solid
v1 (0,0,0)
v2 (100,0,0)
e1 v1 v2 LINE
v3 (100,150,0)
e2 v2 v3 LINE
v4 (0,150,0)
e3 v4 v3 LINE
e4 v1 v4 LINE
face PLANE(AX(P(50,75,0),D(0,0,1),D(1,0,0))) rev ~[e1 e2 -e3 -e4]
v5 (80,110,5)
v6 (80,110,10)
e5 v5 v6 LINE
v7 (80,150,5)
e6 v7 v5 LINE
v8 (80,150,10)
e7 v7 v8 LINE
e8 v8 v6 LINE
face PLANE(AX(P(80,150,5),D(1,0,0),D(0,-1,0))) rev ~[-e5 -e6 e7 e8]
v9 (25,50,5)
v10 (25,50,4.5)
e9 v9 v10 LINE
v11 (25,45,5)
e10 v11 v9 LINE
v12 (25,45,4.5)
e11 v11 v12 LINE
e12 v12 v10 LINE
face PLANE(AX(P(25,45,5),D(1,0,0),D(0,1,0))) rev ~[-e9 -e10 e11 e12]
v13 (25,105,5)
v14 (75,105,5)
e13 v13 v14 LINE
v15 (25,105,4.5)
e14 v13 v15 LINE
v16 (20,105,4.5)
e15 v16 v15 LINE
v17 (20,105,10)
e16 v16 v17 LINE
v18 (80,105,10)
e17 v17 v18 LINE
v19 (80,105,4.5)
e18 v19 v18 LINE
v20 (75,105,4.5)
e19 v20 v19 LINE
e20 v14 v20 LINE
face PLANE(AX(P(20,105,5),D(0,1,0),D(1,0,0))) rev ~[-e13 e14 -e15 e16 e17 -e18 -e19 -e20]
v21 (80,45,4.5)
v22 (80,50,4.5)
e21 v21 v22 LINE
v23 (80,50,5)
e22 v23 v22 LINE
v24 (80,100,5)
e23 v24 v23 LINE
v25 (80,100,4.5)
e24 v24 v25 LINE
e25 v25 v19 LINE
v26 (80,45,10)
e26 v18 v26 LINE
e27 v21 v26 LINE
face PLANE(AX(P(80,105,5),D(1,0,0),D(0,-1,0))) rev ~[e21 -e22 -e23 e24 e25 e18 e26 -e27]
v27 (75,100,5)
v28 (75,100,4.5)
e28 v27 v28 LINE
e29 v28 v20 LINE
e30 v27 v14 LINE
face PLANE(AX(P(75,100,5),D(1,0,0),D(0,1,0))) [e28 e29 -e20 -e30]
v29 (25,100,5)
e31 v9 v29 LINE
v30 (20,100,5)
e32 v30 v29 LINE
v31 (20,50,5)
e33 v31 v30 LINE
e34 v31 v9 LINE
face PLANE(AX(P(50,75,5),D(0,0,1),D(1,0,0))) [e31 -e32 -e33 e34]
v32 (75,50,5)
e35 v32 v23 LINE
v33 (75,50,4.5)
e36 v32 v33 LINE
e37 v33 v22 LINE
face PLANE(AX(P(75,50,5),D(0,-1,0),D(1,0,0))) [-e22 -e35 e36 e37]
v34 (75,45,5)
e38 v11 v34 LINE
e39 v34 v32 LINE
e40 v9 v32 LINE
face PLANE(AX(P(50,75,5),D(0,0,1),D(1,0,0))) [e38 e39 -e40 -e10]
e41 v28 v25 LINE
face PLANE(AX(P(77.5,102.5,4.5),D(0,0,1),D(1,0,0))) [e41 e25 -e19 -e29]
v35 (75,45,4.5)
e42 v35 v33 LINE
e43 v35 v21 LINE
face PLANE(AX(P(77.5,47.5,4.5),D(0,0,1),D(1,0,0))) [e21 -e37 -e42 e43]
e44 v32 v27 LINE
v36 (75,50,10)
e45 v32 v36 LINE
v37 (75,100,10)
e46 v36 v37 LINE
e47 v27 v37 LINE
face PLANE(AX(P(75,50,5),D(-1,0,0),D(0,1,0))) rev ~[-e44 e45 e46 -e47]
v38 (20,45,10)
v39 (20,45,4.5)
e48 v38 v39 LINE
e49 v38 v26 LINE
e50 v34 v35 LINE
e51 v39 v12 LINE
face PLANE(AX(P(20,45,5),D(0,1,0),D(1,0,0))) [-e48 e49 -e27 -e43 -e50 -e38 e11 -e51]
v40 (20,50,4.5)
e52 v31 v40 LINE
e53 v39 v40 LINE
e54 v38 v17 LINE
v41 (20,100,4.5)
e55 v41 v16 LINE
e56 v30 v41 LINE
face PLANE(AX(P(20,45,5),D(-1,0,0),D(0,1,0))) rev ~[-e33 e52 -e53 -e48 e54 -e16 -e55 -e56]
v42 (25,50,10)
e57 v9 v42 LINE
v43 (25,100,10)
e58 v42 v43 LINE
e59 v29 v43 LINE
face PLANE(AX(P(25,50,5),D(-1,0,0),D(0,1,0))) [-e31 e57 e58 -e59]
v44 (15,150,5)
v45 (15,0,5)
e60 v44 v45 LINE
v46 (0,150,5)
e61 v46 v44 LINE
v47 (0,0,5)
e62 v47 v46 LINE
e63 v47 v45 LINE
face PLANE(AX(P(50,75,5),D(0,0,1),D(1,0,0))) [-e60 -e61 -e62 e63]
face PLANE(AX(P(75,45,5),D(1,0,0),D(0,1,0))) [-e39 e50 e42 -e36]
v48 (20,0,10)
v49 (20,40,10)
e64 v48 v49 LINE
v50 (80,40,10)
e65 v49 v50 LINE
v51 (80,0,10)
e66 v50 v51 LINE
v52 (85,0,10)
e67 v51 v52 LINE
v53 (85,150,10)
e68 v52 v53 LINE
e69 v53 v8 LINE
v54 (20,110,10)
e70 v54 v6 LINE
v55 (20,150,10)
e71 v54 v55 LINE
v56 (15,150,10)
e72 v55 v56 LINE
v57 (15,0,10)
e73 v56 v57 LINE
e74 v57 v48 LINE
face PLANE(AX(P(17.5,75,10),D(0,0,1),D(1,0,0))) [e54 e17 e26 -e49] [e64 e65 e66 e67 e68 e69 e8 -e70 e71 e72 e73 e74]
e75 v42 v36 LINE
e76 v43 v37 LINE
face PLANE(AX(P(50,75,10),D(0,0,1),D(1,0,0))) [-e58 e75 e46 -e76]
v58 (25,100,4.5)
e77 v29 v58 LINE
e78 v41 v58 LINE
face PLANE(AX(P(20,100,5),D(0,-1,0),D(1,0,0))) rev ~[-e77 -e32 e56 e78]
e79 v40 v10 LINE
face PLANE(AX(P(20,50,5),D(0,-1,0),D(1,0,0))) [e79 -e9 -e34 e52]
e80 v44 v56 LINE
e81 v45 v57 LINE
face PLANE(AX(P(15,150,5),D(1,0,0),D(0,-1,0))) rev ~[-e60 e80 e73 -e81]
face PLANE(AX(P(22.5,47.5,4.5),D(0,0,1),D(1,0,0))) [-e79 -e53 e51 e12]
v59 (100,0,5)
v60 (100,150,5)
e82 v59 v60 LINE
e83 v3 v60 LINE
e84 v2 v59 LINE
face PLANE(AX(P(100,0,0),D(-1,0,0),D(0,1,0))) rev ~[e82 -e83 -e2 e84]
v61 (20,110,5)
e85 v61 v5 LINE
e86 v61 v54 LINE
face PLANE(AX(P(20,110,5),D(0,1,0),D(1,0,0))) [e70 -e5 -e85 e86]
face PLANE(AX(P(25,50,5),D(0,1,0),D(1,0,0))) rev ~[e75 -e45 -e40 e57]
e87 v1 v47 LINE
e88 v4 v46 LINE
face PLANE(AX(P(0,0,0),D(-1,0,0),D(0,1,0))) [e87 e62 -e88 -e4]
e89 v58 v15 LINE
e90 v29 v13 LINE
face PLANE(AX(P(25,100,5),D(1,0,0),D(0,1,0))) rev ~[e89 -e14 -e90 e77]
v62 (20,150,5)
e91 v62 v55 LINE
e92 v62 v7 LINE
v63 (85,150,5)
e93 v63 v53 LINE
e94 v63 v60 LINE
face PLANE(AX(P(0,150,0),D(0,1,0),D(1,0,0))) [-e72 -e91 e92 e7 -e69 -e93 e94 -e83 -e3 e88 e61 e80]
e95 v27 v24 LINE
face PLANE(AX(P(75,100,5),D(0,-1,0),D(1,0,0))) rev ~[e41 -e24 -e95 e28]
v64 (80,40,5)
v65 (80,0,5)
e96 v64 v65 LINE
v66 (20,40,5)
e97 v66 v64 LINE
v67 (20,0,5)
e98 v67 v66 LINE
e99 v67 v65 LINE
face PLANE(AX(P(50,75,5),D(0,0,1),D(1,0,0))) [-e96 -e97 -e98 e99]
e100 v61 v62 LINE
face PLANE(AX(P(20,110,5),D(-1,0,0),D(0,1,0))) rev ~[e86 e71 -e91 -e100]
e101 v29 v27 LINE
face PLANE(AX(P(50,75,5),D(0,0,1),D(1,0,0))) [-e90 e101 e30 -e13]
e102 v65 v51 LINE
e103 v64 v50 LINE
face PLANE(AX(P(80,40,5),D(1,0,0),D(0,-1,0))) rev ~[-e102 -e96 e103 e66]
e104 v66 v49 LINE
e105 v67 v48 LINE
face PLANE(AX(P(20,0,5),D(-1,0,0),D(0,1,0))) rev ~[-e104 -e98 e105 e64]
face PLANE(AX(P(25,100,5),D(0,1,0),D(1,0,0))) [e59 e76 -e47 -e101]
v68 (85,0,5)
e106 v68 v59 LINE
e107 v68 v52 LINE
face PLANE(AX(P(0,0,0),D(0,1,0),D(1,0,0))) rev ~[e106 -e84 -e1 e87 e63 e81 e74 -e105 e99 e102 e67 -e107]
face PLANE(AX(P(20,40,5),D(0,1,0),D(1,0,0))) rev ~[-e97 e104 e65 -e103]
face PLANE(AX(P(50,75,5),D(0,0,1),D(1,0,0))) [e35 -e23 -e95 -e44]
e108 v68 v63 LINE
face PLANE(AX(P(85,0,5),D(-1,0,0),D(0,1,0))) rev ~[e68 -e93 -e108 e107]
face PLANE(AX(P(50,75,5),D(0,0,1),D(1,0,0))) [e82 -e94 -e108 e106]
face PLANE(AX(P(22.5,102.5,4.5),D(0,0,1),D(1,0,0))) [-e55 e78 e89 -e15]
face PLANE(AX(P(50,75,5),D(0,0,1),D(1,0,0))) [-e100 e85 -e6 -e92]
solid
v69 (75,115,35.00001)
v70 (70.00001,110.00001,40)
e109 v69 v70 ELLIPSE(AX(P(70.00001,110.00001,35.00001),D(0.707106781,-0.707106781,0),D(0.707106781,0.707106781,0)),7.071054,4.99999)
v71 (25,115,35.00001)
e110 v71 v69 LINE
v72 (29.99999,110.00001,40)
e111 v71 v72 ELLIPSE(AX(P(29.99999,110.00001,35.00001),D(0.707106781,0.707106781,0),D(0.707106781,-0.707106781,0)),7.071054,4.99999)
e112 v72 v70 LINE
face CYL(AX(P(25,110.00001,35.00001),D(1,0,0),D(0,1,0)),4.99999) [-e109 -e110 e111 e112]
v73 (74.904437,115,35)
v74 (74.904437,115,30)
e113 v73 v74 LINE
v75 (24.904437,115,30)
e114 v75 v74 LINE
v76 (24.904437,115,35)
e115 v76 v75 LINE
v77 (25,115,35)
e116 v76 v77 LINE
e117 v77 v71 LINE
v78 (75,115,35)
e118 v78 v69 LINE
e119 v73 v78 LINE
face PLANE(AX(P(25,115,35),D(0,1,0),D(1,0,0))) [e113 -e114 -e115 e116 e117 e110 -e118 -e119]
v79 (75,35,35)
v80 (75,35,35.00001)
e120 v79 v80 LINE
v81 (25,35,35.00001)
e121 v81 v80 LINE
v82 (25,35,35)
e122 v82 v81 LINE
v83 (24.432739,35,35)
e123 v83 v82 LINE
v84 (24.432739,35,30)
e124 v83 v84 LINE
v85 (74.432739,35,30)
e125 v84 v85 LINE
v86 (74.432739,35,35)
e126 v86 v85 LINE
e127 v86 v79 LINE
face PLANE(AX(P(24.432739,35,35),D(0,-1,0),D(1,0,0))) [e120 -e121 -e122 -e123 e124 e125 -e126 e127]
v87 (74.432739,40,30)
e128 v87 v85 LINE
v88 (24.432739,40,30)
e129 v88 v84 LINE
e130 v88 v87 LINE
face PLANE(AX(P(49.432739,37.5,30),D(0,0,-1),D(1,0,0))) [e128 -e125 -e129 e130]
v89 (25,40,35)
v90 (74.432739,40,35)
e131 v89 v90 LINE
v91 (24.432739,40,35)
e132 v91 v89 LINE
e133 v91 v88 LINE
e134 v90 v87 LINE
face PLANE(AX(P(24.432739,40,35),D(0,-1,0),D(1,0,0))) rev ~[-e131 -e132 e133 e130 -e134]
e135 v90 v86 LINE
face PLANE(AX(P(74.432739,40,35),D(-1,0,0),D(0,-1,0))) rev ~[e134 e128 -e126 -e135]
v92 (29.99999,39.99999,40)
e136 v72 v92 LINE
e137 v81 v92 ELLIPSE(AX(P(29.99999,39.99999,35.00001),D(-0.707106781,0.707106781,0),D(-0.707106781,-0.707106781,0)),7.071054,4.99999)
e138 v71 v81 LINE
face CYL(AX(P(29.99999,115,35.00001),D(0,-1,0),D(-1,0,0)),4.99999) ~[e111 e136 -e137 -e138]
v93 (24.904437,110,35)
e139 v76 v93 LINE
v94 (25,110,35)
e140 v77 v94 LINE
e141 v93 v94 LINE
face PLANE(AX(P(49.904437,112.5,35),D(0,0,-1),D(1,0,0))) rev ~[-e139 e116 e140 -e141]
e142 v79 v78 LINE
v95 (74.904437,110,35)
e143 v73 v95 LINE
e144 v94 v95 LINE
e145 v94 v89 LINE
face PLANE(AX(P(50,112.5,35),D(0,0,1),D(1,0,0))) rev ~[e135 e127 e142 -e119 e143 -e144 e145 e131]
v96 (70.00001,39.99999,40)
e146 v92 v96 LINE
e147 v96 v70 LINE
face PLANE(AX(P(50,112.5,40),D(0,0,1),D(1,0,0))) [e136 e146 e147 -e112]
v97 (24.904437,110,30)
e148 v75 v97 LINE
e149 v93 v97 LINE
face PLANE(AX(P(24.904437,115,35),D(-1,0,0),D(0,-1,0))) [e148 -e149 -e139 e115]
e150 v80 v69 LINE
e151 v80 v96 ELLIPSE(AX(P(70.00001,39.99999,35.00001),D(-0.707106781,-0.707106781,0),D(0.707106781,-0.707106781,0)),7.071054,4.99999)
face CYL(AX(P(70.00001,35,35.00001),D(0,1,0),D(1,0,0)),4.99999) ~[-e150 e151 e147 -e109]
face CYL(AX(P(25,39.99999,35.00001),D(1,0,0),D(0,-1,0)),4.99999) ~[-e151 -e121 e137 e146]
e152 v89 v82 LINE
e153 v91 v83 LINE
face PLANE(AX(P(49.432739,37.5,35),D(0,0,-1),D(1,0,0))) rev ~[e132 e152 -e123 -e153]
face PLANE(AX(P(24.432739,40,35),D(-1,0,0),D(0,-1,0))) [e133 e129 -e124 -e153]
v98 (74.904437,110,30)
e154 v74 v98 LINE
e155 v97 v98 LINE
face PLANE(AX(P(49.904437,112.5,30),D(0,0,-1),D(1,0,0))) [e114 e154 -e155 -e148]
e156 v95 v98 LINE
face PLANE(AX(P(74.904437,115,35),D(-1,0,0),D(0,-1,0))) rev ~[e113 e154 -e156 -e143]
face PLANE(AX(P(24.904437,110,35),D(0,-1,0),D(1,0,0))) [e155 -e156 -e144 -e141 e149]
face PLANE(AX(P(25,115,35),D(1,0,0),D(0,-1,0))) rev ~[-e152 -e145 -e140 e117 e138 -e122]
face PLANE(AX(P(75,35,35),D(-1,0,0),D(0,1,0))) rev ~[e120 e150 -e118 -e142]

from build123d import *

# Parameters (mm, degrees)
F0_W      = 100
F0_H      = 150
F1_DEPTH  = 5
F3_W      = 60
F3_H      = 5
F4_DEPTH  = 5
F5_W      = 5
F5_H      = 5
F6_DEPTH  = 0.5
F7_W      = 50
F7_H      = 50
F8_DEPTH  = 5
F10_W     = 50
F10_H     = 5
F10_H_2   = 70
F11_DEPTH = 5
F13_W     = 50
F13_H     = 5
F14_DEPTH = 5
F15_R     = 4.99999


# Not quite as in the source:
# - a fillet or chamfer is up to 0.001 mm smaller than in the source, because OpenCascade refuses the exact size


with BuildPart() as f1:
    # F0 (on Top) → F1 (new body)
    with BuildSketch(Plane.XY):
        with Locations((50, 75)):
            Rectangle(F0_W, F0_H)
    extrude(amount=F1_DEPTH)

    # F3 (on offset) → F4 (join)
    with BuildSketch(Plane.XY.offset(5)):
        Polygon((20, 150), (15, 150), (15, 0), (20, 0), (20, 40), (20, 45), (20, 105), (20, 110), align=None)
        with Locations((50, 107.5)):
            Rectangle(F3_W, F3_H)
        Polygon((80, 150), (80, 110), (80, 105), (80, 45), (80, 40), (80, 0), (85, 0), (85, 150), align=None)
        with Locations((50, 42.5)):
            Rectangle(F3_W, F3_H)
    extrude(amount=F4_DEPTH)

    # F5 (on offset) → F6 (cut)
    with BuildSketch(Plane.XY.offset(5)):
        with Locations((22.5, 102.5)):
            Rectangle(F5_W, F5_H)
        with Locations((77.5, 102.5)):
            Rectangle(F5_W, F5_H)
        with Locations((77.5, 47.5)):
            Rectangle(F5_W, F5_H)
        with Locations((22.5, 47.5)):
            Rectangle(F5_W, F5_H)
    extrude(amount=-F6_DEPTH, mode=Mode.SUBTRACT)

    # F7 (on offset) → F8 (join)
    with BuildSketch(Plane.XY.offset(5)):
        with Locations((50, 75)):
            Rectangle(F7_W, F7_H)
    extrude(amount=F8_DEPTH)


with BuildPart() as f11:
    # F10 (on offset) → F11 (new body)
    with BuildSketch(Plane.XY.offset(35)):
        with Locations((50, 112.5)):
            Rectangle(F10_W, F10_H)
        with Locations((50, 75)):
            Rectangle(F10_W, F10_H_2)
        with Locations((50, 37.5)):
            Rectangle(F10_W, F10_H)
    extrude(amount=F11_DEPTH)

    # F13 (on offset) → F14 (join)
    with BuildSketch(Plane(origin=(0, 0, 35), x_dir=(1, 0, 0), z_dir=(0, 0, -1))):
        with Locations((49.4327385849, -37.5)):
            Rectangle(F13_W, F13_H)
        with Locations((49.9044367713, -112.5)):
            Rectangle(F13_W, F13_H)
    extrude(amount=F14_DEPTH)

    # F15 (radius 5 in the source; OpenCascade refuses exactly that, so slightly less here)
    f15_edges = [f11.edges().sort_by_distance(p)[0] for p in [
        (50, 115, 40),
        (25, 75, 40),
        (50, 35, 40),
        (75, 75, 40),
    ]]
    fillet(f15_edges, radius=F15_R)


solid = Compound([f1.part, f11.part])
